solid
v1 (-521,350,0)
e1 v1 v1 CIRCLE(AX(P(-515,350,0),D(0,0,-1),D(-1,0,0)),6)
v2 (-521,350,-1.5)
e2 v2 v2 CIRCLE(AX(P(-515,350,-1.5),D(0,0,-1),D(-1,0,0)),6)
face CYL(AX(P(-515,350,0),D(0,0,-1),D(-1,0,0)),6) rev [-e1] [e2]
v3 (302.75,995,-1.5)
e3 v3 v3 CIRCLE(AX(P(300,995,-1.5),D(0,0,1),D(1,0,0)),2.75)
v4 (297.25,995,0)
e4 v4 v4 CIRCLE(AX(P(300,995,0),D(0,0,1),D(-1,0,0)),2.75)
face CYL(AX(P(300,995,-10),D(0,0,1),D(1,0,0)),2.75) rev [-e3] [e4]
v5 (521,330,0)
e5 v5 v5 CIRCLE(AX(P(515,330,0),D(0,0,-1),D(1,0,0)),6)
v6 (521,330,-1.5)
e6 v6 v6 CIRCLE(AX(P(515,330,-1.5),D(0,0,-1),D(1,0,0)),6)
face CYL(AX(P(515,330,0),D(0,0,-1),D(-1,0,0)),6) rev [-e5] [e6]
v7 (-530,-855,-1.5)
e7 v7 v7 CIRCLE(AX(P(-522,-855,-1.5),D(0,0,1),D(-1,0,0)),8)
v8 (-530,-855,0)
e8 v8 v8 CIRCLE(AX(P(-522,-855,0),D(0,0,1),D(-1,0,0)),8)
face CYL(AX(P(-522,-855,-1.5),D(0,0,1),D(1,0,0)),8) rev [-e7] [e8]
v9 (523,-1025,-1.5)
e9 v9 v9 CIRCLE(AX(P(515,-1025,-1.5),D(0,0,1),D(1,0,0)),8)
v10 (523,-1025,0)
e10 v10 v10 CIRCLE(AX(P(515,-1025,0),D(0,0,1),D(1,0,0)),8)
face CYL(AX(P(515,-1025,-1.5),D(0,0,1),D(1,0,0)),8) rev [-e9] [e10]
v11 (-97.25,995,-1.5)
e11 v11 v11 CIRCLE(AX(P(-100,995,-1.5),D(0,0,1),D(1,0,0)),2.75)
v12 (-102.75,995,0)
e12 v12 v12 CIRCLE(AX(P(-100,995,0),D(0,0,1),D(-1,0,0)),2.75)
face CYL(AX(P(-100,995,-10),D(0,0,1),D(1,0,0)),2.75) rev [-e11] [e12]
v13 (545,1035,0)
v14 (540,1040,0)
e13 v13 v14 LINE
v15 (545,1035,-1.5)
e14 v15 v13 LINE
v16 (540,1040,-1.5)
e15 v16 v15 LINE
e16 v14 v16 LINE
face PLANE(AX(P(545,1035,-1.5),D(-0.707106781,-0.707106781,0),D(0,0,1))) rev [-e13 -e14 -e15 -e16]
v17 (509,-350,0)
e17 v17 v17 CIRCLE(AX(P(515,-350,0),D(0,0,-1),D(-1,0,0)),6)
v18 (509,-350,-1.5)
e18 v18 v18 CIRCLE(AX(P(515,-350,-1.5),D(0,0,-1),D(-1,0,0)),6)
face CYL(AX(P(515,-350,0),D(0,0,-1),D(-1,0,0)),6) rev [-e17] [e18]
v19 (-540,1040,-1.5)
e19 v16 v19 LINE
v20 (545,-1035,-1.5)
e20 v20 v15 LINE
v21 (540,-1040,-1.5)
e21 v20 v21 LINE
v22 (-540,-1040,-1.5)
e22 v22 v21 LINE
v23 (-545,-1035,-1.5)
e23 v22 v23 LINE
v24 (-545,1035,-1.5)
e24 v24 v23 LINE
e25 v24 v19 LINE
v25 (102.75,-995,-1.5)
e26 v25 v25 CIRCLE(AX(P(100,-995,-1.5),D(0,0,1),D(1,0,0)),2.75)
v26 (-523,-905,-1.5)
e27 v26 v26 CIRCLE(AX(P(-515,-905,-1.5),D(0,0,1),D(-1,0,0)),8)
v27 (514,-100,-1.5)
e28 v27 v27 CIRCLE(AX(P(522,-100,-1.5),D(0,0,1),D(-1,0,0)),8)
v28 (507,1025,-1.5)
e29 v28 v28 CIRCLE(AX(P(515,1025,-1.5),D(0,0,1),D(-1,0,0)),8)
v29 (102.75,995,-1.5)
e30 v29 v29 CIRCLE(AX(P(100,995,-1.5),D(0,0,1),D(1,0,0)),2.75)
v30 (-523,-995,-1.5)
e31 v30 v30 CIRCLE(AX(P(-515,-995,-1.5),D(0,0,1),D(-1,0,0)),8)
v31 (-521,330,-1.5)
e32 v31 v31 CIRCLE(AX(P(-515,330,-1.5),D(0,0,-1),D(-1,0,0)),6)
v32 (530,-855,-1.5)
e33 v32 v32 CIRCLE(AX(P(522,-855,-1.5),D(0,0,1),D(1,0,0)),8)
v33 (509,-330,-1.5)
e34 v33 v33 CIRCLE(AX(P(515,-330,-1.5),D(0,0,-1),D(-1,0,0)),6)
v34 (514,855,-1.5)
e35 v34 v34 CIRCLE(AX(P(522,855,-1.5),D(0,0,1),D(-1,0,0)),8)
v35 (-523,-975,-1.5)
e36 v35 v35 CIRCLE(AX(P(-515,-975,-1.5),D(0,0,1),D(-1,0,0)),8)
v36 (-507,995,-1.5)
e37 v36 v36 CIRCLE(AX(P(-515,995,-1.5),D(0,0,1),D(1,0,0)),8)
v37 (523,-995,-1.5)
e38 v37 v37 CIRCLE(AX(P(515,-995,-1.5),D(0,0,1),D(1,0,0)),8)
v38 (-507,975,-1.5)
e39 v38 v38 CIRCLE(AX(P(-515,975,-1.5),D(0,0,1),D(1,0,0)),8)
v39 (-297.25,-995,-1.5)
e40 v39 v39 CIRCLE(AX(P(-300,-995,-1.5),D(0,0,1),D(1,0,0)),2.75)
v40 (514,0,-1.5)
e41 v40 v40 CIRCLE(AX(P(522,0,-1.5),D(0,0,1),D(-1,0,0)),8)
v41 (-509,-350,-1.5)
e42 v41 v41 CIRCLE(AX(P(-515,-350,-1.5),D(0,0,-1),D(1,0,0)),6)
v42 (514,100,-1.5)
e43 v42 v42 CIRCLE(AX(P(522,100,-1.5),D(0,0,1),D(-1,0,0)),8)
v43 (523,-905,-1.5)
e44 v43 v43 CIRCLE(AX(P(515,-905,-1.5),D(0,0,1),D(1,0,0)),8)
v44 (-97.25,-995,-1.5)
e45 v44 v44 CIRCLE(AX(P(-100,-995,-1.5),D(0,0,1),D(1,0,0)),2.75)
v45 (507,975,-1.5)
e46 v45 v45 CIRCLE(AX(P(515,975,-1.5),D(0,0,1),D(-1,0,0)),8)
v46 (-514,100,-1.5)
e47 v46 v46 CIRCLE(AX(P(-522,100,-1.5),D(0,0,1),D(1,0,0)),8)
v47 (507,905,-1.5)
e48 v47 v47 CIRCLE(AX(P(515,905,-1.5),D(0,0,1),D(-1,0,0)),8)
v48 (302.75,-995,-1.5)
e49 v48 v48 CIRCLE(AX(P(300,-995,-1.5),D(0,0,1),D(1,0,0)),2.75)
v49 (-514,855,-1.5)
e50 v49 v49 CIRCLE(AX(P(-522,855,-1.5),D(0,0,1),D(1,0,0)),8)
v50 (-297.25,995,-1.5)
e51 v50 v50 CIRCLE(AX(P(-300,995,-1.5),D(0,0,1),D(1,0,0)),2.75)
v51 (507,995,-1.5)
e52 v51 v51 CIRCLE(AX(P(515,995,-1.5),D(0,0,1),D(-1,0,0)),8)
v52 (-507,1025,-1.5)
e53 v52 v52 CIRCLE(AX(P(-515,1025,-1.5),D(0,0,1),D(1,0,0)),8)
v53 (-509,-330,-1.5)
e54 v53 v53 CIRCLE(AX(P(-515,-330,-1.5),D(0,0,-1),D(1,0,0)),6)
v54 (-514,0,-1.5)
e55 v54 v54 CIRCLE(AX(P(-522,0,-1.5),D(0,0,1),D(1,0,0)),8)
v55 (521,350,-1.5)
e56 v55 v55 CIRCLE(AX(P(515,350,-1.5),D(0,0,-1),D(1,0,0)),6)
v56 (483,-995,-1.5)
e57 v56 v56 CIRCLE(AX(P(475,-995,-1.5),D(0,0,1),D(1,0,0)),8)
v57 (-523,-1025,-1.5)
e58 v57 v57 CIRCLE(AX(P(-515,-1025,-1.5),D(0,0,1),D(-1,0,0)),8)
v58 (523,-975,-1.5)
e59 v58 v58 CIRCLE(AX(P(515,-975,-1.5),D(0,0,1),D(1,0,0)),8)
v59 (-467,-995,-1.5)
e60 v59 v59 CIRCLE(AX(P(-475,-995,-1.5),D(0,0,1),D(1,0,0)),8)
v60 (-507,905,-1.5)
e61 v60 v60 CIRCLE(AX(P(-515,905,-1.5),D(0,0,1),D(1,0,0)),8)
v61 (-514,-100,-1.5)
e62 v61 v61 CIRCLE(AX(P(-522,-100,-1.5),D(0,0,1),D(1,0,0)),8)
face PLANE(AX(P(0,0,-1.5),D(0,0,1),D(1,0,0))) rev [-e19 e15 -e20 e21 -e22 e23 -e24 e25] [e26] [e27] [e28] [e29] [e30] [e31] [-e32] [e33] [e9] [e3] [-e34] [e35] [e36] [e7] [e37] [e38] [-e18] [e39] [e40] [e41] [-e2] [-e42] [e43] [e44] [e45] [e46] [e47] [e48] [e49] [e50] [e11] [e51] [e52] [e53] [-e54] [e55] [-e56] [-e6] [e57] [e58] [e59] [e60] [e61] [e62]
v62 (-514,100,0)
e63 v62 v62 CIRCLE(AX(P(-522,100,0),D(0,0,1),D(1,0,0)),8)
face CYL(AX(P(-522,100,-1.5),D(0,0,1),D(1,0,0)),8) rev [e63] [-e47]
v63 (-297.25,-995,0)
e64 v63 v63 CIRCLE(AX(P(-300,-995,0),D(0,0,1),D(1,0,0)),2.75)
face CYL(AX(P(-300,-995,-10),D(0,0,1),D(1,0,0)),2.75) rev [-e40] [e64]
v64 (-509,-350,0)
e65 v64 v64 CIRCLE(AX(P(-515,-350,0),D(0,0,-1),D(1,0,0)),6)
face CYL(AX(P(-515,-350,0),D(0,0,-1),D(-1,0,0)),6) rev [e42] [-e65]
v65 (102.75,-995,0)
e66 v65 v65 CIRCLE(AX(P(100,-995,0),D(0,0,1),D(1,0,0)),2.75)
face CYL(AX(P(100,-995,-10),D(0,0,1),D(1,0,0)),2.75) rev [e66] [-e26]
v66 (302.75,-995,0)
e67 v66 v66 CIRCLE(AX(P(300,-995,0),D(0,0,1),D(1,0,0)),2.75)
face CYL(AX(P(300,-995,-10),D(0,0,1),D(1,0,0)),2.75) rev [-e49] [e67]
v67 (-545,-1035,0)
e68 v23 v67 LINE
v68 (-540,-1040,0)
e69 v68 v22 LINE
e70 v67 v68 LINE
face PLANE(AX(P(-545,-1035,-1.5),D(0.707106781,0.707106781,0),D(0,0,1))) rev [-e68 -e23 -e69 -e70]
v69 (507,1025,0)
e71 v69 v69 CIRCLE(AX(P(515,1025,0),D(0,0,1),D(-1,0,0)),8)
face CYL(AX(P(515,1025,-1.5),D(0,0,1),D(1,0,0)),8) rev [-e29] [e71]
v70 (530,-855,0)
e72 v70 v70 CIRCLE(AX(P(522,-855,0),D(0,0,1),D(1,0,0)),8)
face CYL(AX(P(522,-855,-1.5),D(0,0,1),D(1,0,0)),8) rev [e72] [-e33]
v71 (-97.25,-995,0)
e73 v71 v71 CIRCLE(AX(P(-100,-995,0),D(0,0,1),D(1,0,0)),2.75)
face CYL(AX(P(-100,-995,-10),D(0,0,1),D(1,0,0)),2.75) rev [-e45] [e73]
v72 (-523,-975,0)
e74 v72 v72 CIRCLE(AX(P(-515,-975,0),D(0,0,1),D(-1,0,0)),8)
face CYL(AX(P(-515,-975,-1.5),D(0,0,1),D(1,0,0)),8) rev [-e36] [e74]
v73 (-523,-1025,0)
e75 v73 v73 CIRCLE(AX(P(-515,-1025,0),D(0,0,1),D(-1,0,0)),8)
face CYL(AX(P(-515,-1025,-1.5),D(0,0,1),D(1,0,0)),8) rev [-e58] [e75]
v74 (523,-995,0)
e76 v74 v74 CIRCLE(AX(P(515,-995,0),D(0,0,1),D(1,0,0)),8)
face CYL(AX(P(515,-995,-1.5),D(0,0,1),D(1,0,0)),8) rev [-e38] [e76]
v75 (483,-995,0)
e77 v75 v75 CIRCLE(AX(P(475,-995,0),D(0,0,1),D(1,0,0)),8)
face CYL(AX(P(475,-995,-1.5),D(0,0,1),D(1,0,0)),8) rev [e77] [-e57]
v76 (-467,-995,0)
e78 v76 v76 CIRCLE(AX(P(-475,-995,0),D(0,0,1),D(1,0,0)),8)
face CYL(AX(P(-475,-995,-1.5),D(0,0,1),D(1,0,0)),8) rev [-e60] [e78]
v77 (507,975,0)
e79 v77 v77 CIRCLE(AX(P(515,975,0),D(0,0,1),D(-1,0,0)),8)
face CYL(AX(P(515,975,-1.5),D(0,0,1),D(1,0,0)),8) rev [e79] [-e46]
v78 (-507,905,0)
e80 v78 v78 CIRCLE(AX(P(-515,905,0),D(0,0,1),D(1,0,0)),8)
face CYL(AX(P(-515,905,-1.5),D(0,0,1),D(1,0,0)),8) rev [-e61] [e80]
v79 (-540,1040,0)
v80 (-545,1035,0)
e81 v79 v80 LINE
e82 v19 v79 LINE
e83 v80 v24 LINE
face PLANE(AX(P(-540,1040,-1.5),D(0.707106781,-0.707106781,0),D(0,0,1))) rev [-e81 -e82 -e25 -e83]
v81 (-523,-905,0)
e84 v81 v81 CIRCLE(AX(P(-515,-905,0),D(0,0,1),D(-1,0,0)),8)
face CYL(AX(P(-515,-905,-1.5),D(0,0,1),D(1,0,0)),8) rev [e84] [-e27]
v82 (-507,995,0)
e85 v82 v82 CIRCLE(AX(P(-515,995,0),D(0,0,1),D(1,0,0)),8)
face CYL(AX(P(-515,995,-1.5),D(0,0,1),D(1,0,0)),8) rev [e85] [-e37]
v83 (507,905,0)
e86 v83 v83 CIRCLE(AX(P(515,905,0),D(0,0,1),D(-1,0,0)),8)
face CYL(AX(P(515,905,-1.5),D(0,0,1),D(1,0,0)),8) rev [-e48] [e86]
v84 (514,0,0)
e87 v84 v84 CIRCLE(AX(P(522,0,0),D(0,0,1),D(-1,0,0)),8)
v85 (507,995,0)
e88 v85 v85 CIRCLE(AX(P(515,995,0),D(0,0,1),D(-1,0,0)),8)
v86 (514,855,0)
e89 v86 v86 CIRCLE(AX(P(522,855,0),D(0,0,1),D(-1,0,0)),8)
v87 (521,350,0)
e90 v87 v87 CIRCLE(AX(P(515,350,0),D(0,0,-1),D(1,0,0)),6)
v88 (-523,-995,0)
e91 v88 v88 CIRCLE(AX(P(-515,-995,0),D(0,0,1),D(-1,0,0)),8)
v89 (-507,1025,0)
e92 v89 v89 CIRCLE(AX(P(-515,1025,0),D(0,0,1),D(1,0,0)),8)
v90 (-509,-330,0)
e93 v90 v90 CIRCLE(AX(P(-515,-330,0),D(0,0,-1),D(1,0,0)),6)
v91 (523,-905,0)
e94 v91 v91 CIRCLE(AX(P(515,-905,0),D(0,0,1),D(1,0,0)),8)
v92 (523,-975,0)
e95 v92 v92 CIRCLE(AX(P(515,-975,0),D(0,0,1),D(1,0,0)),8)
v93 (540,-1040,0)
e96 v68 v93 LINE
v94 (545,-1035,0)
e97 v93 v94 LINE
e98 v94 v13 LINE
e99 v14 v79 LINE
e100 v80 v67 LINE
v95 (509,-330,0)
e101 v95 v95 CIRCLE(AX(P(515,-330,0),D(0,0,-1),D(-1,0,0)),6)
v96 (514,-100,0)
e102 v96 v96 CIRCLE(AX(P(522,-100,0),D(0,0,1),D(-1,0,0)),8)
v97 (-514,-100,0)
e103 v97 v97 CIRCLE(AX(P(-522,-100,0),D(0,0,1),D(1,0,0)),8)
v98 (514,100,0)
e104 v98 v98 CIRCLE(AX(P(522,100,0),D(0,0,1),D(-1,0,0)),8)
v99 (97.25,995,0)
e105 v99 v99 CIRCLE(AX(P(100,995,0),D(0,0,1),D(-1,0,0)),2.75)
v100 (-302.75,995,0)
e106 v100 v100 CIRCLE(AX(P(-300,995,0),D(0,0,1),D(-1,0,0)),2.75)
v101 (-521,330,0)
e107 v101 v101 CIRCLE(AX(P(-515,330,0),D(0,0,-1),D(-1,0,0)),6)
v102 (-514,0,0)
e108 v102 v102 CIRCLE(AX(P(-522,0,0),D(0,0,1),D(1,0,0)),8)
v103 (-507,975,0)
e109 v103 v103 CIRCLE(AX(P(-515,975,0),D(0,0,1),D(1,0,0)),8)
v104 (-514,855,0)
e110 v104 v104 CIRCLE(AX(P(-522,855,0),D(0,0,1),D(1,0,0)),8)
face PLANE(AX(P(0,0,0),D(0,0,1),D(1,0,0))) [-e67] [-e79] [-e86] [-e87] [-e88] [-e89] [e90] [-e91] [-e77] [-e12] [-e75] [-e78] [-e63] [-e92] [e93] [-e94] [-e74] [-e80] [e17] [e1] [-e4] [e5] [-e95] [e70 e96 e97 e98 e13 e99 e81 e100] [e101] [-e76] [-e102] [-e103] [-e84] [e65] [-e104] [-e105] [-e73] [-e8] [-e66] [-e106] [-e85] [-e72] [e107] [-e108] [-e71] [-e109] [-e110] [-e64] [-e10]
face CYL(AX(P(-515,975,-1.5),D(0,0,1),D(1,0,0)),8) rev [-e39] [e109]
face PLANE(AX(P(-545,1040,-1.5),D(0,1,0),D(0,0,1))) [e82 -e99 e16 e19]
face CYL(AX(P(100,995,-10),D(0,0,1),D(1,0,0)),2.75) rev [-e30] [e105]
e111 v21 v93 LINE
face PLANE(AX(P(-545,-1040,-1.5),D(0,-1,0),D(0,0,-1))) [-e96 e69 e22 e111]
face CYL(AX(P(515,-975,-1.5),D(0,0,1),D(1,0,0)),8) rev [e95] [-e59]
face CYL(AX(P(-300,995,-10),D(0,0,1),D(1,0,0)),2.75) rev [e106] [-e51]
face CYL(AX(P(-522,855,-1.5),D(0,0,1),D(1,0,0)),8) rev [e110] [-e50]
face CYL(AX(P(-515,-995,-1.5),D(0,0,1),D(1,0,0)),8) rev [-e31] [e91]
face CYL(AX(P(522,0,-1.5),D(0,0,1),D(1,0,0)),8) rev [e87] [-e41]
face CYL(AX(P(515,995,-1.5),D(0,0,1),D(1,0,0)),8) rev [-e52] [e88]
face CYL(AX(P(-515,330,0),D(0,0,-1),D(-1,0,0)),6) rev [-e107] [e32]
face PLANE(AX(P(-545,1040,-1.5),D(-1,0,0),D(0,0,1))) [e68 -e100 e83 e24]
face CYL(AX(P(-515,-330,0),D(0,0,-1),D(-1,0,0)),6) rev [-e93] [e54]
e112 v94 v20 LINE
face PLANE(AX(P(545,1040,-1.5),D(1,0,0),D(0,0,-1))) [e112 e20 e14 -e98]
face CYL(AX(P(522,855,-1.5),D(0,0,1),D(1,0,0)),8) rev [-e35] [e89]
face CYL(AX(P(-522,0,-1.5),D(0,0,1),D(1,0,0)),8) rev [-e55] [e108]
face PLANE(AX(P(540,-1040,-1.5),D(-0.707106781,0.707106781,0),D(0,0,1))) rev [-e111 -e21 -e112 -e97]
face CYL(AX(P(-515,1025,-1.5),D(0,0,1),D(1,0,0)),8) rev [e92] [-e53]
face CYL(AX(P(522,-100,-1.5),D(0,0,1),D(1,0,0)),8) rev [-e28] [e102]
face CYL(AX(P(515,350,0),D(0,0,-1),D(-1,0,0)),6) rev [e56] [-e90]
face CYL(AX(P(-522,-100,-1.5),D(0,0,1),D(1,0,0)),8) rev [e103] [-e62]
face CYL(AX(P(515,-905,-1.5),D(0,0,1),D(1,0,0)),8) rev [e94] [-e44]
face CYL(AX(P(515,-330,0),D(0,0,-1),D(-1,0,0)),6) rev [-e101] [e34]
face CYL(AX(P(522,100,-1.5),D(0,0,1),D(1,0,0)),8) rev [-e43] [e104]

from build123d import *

# Parameters (mm, degrees)
SKETCH_1_W             = 1090
SKETCH_1_H             = 2080
SM_BASE_FLANGE_1_DEPTH = 1.5
SKETCH_6_R             = 8
CUT_EXTRUDE_1_DEPTH    = 10
SKETCH_7_R             = 8
CUT_EXTRUDE_2_DEPTH    = 10
OTHER_START            = -1.5
OTHER_1_DEPTH          = 1.5
SKETCH_11_R            = 6
CUT_EXTRUDE_6_DEPTH    = 10
SKETCH_12_R            = 2.75
CUT_EXTRUDE_7_DEPTH    = 10


# Read off the part's stored shape, not the designer's step: Затупленный угол1
# Sheet-metal steps are written as plain solids
with BuildPart() as part:
    # Sketch 1 → Базовая кромка1 (new body)
    with BuildSketch(Plane.XY):
        Rectangle(SKETCH_1_W, SKETCH_1_H)
    extrude(amount=-SM_BASE_FLANGE_1_DEPTH)

    # Эскиз6 → Вырез-Вытянуть1 (cut)
    with BuildSketch(Plane.XY):
        with Locations((-515, 1025)):
            Circle(SKETCH_6_R)
        with Locations((-515, 995)):
            Circle(SKETCH_6_R)
        with Locations((-515, 975)):
            Circle(SKETCH_6_R)
        with Locations((-515, 905)):
            Circle(SKETCH_6_R)
        with Locations((-522, 855)):
            Circle(SKETCH_6_R)
        with Locations((-522, 0)):
            Circle(SKETCH_6_R)
        with Locations((-522, 100)):
            Circle(SKETCH_6_R)
        with Locations((-522, -100)):
            Circle(SKETCH_6_R)
        with Locations(Location((-522, -855, 0), (0, 0, 180))):
            Circle(SKETCH_6_R)
        with Locations(Location((-515, -905, 0), (0, 0, 180))):
            Circle(SKETCH_6_R)
        with Locations(Location((-515, -975, 0), (0, 0, 180))):
            Circle(SKETCH_6_R)
        with Locations(Location((-515, -995, 0), (0, 0, 180))):
            Circle(SKETCH_6_R)
        with Locations(Location((-515, -1025, 0), (0, 0, 180))):
            Circle(SKETCH_6_R)
        with Locations((515, -1025)):
            Circle(SKETCH_6_R)
        with Locations((515, -995)):
            Circle(SKETCH_6_R)
        with Locations((515, -975)):
            Circle(SKETCH_6_R)
        with Locations((515, -905)):
            Circle(SKETCH_6_R)
        with Locations((522, -855)):
            Circle(SKETCH_6_R)
        with Locations(Location((522, -100, 0), (0, 0, 180))):
            Circle(SKETCH_6_R)
        with Locations(Location((522, 100, 0), (0, 0, 180))):
            Circle(SKETCH_6_R)
        with Locations(Location((522, 0, 0), (0, 0, 180))):
            Circle(SKETCH_6_R)
        with Locations(Location((522, 855, 0), (0, 0, 180))):
            Circle(SKETCH_6_R)
        with Locations(Location((515, 905, 0), (0, 0, 180))):
            Circle(SKETCH_6_R)
        with Locations(Location((515, 975, 0), (0, 0, 180))):
            Circle(SKETCH_6_R)
        with Locations(Location((515, 995, 0), (0, 0, 180))):
            Circle(SKETCH_6_R)
        with Locations(Location((515, 1025, 0), (0, 0, 180))):
            Circle(SKETCH_6_R)
    extrude(amount=-CUT_EXTRUDE_1_DEPTH, mode=Mode.SUBTRACT)

    # Эскиз7 → Вырез-Вытянуть2 (cut)
    with BuildSketch(Plane.XY):
        with Locations((-475, -995)):
            Circle(SKETCH_7_R)
        with Locations((475, -995)):
            Circle(SKETCH_7_R)
    extrude(amount=-CUT_EXTRUDE_2_DEPTH, mode=Mode.SUBTRACT)

    # Other 1 outline → Other 1 (cut)
    with BuildSketch(Plane.XY.offset(OTHER_START)):
        Polygon((-545, -1040), (-540, -1040), (-545, -1035), align=None)
        Polygon((545, -1035), (540, -1040), (545, -1040), align=None)
        Polygon((-545, 1040), (-545, 1035), (-540, 1040), align=None)
        Polygon((540, 1040), (545, 1035), (545, 1040), align=None)
    extrude(amount=OTHER_1_DEPTH, mode=Mode.SUBTRACT)

    # Эскиз11 → Вырез-Вытянуть6 (cut)
    with BuildSketch(Plane(origin=(0, 0, -1.5), x_dir=(-1, 0, 0), z_dir=(0, 0, -1))):
        with Locations((-515, -330)):
            Circle(SKETCH_11_R)
        with Locations((-515, -350)):
            Circle(SKETCH_11_R)
        with Locations(Location((515, -350, 0), (0, 0, 180))):
            Circle(SKETCH_11_R)
        with Locations(Location((515, -330, 0), (0, 0, 180))):
            Circle(SKETCH_11_R)
        with Locations((515, 330)):
            Circle(SKETCH_11_R)
        with Locations((515, 350)):
            Circle(SKETCH_11_R)
        with Locations(Location((-515, 350, 0), (0, 0, 180))):
            Circle(SKETCH_11_R)
        with Locations(Location((-515, 330, 0), (0, 0, 180))):
            Circle(SKETCH_11_R)
    extrude(amount=-CUT_EXTRUDE_6_DEPTH, mode=Mode.SUBTRACT)

    # Эскиз12 → Вырез-Вытянуть7 (cut)
    with BuildSketch(Plane.XY):
        with Locations((-300, -995)):
            Circle(SKETCH_12_R)
        with Locations((-100, 995)):
            Circle(SKETCH_12_R)
        with Locations((300, -995)):
            Circle(SKETCH_12_R)
        with Locations((-100, -995)):
            Circle(SKETCH_12_R)
        with Locations((100, -995)):
            Circle(SKETCH_12_R)
        with Locations((-300, 995)):
            Circle(SKETCH_12_R)
        with Locations((100, 995)):
            Circle(SKETCH_12_R)
        with Locations((300, 995)):
            Circle(SKETCH_12_R)
    extrude(amount=-CUT_EXTRUDE_7_DEPTH, mode=Mode.SUBTRACT)


solid = part.part
